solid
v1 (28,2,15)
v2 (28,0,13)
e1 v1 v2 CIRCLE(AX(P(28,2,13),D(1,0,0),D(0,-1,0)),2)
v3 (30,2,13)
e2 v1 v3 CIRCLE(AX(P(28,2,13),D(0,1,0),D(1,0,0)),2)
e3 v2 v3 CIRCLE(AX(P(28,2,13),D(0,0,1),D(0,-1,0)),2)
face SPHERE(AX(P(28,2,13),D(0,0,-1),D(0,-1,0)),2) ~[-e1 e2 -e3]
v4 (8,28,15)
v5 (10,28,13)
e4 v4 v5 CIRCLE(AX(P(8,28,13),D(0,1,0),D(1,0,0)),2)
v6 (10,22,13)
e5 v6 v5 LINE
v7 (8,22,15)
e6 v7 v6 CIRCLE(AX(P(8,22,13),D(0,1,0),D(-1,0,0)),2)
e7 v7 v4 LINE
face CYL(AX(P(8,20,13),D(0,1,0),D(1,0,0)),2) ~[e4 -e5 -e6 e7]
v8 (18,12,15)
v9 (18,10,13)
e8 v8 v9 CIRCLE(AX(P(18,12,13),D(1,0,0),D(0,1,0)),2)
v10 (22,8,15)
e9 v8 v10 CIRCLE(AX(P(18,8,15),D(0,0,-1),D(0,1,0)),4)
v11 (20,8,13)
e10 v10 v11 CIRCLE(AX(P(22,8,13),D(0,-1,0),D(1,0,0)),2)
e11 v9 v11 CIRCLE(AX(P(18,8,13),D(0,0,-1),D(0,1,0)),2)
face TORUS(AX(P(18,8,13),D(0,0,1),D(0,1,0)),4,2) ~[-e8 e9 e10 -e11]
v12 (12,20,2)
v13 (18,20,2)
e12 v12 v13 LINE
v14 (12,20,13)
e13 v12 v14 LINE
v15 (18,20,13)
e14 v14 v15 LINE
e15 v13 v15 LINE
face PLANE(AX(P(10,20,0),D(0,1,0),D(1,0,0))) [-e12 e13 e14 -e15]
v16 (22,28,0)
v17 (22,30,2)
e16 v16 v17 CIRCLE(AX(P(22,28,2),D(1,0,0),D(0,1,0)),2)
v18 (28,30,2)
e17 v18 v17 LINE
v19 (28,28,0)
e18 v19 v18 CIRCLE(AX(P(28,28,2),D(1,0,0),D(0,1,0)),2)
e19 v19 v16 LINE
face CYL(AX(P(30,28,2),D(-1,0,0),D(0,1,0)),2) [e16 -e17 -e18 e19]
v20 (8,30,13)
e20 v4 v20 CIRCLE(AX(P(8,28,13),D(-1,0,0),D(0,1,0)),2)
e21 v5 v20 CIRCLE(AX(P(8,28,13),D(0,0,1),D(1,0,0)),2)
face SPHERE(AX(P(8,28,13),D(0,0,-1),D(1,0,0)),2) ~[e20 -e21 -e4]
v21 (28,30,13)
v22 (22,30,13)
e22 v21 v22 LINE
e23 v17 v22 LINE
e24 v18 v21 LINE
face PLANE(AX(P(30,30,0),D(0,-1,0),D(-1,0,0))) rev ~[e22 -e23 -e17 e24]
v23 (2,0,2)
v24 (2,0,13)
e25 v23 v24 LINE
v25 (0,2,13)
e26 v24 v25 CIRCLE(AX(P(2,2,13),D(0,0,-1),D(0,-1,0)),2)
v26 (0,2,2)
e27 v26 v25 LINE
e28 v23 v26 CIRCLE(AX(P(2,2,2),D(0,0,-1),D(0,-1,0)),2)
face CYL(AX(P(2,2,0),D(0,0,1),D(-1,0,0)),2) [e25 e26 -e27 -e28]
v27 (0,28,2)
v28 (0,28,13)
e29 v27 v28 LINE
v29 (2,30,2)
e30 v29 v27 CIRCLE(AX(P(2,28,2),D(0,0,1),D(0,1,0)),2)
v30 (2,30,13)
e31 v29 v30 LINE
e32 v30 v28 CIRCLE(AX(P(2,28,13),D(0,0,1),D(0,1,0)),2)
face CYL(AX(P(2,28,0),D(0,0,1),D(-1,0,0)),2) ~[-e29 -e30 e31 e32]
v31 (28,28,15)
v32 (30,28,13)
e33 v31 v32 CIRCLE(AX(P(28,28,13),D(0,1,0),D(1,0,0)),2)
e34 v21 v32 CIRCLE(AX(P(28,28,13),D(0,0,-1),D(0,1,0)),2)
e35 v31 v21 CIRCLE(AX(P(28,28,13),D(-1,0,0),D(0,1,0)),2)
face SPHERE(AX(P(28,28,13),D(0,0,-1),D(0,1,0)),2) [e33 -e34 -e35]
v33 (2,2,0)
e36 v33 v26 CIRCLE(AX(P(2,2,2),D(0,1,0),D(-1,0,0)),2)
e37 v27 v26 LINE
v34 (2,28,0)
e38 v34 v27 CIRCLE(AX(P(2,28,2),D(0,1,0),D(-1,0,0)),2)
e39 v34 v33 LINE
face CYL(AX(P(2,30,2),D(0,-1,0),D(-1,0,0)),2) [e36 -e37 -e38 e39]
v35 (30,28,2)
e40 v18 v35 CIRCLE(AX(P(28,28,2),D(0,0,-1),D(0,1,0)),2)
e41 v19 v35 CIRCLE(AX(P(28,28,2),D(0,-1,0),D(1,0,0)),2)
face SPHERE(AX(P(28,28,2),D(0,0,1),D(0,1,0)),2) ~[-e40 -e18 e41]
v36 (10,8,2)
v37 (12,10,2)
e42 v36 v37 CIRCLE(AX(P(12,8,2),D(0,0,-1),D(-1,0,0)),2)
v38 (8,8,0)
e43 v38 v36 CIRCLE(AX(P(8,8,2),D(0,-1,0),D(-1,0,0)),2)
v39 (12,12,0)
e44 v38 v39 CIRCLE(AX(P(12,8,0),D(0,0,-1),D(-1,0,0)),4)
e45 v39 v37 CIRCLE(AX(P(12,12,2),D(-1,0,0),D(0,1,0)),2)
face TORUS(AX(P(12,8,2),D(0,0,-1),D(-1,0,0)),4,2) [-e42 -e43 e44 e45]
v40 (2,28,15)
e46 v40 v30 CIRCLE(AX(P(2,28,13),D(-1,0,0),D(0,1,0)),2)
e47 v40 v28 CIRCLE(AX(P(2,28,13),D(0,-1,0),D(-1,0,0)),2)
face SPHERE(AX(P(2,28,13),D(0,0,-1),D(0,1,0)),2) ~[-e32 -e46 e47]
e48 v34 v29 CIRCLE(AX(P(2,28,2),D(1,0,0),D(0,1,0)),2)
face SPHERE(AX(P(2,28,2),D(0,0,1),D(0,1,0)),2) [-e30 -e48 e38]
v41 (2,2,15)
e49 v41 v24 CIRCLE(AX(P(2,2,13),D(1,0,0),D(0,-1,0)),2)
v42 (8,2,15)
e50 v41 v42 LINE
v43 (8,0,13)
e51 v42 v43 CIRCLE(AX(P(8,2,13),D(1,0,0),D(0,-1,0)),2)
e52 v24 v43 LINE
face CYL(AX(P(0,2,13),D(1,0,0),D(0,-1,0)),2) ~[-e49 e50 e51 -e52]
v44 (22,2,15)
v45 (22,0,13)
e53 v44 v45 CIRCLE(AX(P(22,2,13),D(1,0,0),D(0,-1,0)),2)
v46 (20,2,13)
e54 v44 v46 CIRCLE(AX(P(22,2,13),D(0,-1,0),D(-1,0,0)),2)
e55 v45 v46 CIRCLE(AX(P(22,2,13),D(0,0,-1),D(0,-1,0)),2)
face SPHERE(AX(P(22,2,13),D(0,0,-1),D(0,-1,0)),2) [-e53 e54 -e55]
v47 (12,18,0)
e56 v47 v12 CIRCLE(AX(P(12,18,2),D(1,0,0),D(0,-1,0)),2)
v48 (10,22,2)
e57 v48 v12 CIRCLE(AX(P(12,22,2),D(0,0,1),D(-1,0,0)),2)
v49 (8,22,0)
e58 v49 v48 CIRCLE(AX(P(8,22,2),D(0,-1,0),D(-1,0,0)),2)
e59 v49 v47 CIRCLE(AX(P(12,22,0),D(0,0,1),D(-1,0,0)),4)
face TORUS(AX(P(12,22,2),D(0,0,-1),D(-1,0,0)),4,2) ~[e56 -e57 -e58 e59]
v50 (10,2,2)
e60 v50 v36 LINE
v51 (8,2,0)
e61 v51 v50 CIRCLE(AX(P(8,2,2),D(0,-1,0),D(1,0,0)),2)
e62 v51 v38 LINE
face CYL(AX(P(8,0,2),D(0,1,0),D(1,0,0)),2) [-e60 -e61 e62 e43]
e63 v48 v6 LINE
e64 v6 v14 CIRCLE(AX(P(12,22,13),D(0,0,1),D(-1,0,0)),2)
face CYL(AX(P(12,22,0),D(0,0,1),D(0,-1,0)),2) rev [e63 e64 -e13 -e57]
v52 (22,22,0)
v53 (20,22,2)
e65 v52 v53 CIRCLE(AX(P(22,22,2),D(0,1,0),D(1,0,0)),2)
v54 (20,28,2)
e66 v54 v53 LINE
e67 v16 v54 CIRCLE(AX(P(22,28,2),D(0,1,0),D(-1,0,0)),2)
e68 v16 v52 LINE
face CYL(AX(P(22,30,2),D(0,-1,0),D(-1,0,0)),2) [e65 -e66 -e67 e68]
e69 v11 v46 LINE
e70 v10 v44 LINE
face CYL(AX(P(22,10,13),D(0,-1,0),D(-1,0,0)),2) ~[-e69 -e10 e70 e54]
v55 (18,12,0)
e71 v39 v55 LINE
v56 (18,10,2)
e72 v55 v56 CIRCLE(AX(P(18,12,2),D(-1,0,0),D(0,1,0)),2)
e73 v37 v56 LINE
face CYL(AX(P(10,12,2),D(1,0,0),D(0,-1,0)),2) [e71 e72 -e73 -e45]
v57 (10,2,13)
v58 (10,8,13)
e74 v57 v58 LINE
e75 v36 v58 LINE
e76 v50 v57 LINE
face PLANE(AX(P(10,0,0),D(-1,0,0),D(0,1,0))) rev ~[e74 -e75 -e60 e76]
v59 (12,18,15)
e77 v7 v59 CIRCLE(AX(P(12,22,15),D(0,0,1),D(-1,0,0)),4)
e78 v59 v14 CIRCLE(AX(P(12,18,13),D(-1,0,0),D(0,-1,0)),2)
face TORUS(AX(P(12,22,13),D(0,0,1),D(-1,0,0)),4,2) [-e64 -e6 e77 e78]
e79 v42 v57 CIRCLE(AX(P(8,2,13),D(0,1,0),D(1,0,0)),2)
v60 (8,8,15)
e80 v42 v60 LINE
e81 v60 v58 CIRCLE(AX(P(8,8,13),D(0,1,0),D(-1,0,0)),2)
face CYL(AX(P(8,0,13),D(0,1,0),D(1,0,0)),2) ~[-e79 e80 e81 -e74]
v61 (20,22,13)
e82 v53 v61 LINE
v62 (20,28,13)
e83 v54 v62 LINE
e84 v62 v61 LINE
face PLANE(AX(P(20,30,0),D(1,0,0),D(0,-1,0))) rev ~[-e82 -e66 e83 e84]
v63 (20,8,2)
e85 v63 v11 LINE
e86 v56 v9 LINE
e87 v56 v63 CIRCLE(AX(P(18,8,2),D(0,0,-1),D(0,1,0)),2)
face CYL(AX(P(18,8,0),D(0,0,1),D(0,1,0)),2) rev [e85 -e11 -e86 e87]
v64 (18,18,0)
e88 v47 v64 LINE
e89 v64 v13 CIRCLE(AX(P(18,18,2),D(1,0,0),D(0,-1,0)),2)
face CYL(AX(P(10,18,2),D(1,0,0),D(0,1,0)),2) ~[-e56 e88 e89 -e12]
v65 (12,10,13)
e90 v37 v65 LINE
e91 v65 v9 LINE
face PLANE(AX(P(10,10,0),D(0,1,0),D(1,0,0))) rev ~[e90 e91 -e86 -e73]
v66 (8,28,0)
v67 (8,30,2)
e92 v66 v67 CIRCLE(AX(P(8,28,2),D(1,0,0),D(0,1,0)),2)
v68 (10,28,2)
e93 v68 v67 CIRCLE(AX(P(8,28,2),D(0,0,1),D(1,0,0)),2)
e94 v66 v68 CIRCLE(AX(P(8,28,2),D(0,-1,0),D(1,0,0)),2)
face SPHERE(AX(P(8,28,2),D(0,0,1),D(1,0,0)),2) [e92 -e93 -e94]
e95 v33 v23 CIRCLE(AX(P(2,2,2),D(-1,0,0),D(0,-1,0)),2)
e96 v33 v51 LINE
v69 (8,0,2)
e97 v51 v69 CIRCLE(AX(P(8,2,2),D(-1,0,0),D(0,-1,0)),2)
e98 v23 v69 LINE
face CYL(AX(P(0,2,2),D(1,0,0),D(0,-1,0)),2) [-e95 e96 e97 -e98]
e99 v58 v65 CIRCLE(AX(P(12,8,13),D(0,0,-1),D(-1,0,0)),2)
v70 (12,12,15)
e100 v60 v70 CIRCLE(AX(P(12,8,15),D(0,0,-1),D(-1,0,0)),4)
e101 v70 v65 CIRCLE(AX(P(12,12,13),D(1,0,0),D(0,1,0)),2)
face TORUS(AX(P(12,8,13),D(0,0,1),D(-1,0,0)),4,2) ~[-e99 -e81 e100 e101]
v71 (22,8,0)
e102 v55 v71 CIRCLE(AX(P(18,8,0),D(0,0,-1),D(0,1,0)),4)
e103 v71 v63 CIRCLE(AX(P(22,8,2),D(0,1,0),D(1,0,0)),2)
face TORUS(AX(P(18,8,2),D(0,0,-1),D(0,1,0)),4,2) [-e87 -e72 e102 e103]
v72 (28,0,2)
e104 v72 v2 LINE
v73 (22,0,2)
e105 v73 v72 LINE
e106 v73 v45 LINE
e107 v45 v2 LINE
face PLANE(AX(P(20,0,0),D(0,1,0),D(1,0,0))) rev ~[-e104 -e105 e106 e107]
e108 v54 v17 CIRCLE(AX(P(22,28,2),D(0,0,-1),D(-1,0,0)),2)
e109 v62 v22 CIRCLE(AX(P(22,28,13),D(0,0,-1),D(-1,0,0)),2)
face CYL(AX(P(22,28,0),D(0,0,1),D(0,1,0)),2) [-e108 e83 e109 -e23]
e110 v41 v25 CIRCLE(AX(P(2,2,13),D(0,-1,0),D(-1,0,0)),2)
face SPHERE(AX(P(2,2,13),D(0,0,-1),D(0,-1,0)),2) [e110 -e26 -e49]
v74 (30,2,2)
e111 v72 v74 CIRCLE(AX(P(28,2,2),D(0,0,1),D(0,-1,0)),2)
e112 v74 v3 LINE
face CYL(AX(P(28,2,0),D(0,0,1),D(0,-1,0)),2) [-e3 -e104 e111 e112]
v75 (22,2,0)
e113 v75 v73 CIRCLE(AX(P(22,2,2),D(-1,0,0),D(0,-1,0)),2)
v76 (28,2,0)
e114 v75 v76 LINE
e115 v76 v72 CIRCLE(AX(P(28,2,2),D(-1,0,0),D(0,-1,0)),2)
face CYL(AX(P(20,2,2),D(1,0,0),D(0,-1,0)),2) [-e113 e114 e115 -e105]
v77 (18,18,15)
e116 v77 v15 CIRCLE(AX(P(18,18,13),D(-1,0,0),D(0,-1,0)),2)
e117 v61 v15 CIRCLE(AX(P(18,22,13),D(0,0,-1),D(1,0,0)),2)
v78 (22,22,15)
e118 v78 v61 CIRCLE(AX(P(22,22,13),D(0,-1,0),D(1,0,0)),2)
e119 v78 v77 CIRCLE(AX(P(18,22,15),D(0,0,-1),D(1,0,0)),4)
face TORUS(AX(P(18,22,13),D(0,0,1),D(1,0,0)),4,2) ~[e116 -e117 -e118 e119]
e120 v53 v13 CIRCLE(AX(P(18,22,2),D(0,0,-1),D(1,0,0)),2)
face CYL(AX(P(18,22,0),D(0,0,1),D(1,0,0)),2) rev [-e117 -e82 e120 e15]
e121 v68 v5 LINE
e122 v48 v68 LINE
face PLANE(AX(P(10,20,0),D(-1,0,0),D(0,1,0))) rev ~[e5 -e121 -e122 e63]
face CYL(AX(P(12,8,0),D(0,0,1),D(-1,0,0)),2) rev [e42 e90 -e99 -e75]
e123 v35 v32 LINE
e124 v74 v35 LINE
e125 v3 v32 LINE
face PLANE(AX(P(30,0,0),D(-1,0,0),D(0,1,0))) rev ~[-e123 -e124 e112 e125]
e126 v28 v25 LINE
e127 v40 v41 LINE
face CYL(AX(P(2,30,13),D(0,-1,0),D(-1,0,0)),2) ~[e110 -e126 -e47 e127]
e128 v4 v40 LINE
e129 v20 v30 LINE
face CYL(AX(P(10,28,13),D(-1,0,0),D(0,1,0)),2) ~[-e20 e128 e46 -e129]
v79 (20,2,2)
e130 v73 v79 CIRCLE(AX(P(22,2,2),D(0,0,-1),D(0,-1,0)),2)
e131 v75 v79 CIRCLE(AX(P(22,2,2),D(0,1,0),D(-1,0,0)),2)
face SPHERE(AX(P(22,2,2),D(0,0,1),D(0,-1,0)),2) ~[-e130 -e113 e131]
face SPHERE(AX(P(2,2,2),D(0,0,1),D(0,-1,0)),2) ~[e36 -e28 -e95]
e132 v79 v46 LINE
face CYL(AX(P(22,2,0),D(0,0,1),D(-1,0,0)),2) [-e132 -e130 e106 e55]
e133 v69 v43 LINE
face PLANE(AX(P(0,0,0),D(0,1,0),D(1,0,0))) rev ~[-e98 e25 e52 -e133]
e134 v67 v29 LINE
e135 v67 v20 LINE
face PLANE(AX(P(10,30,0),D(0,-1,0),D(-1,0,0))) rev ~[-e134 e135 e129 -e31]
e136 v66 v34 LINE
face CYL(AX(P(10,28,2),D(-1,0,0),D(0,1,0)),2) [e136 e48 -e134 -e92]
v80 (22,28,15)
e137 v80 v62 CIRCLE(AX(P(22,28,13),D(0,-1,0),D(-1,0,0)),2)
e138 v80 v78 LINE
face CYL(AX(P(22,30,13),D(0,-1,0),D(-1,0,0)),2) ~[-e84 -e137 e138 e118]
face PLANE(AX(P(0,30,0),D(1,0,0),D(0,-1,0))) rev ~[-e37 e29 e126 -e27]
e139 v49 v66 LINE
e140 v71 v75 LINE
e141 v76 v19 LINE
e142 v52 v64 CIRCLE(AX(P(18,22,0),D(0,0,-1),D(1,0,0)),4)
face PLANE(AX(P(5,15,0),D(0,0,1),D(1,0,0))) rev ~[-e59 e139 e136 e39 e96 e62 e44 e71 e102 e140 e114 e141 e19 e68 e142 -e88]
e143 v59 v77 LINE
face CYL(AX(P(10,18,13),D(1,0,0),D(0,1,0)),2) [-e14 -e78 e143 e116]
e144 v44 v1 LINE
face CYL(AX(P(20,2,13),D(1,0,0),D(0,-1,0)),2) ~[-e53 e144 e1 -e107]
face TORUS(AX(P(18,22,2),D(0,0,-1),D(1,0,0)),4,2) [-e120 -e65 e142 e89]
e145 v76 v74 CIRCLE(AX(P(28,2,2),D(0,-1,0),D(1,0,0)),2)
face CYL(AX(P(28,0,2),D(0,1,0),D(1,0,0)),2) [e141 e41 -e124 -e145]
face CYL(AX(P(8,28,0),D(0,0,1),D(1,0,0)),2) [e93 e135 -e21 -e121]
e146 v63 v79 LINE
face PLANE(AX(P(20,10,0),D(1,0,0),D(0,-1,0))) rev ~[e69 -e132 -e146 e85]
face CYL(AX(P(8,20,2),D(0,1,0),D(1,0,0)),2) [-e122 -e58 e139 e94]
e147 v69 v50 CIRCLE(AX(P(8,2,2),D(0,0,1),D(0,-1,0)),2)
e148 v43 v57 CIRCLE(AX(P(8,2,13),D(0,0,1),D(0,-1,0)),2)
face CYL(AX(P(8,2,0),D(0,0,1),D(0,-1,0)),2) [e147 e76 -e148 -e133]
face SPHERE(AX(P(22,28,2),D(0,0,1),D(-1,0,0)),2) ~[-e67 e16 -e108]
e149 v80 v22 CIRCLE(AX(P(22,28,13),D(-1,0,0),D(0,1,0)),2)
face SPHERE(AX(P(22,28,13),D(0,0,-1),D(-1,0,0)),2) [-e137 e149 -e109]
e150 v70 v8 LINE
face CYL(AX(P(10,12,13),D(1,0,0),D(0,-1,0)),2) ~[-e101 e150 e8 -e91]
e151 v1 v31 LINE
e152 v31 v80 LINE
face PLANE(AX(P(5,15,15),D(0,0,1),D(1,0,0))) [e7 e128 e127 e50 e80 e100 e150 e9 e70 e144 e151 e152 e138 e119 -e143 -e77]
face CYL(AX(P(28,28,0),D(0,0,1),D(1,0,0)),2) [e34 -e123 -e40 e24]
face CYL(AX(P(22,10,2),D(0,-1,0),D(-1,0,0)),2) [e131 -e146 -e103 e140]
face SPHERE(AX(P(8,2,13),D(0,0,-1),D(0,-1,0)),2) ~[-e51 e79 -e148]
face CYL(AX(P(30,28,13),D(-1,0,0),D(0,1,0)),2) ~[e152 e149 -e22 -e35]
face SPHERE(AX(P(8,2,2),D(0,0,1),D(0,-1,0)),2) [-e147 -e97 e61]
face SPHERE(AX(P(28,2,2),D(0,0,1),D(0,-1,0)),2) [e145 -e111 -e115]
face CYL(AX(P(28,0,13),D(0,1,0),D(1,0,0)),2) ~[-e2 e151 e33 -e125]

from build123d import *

# Parameters (mm, degrees)
F0_W     = 10
F0_H     = 10
F1_DEPTH = 15
F2_R     = 2


with BuildPart() as f1:
    # F0 (on Top) → F1 (new body)
    with BuildSketch(Plane.XY):
        Polygon((0, 30), (0, 0), (10, 0), (10, 10), (10, 20), (10, 30), align=None)
        with Locations((15, 15)):
            Rectangle(F0_W, F0_H)
        Polygon((20, 20), (20, 10), (20, 0), (30, 0), (30, 30), (20, 30), align=None)
    extrude(amount=F1_DEPTH)

    # F2
    f2_edges = [f1.edges().sort_by_distance(p)[0] for p in [
        (0, 30, 7.5),
        (20, 30, 7.5),
        (0, 0, 7.5),
        (10, 0, 7.5),
        (5, 0, 0),
        (5, 0, 15),
        (20, 0, 7.5),
        (30, 0, 7.5),
        (25, 0, 0),
        (25, 0, 15),
        (10, 20, 7.5),
        (10, 30, 7.5),
        (10, 25, 0),
        (10, 25, 15),
        (20, 20, 7.5),
        (20, 25, 0),
        (20, 25, 15),
        (30, 30, 7.5),
        (25, 30, 0),
        (25, 30, 15),
        (30, 15, 15),
        (10, 10, 7.5),
        (10, 5, 0),
        (10, 5, 15),
        (5, 30, 0),
        (5, 30, 15),
        (15, 20, 15),
        (20, 10, 7.5),
        (15, 10, 0),
        (15, 10, 15),
        (20, 5, 15),
        (0, 15, 0),
        (0, 15, 15),
        (30, 15, 0),
        (20, 5, 0),
        (15, 20, 0),
    ]]
    fillet(f2_edges, radius=F2_R)


solid = f1.part
